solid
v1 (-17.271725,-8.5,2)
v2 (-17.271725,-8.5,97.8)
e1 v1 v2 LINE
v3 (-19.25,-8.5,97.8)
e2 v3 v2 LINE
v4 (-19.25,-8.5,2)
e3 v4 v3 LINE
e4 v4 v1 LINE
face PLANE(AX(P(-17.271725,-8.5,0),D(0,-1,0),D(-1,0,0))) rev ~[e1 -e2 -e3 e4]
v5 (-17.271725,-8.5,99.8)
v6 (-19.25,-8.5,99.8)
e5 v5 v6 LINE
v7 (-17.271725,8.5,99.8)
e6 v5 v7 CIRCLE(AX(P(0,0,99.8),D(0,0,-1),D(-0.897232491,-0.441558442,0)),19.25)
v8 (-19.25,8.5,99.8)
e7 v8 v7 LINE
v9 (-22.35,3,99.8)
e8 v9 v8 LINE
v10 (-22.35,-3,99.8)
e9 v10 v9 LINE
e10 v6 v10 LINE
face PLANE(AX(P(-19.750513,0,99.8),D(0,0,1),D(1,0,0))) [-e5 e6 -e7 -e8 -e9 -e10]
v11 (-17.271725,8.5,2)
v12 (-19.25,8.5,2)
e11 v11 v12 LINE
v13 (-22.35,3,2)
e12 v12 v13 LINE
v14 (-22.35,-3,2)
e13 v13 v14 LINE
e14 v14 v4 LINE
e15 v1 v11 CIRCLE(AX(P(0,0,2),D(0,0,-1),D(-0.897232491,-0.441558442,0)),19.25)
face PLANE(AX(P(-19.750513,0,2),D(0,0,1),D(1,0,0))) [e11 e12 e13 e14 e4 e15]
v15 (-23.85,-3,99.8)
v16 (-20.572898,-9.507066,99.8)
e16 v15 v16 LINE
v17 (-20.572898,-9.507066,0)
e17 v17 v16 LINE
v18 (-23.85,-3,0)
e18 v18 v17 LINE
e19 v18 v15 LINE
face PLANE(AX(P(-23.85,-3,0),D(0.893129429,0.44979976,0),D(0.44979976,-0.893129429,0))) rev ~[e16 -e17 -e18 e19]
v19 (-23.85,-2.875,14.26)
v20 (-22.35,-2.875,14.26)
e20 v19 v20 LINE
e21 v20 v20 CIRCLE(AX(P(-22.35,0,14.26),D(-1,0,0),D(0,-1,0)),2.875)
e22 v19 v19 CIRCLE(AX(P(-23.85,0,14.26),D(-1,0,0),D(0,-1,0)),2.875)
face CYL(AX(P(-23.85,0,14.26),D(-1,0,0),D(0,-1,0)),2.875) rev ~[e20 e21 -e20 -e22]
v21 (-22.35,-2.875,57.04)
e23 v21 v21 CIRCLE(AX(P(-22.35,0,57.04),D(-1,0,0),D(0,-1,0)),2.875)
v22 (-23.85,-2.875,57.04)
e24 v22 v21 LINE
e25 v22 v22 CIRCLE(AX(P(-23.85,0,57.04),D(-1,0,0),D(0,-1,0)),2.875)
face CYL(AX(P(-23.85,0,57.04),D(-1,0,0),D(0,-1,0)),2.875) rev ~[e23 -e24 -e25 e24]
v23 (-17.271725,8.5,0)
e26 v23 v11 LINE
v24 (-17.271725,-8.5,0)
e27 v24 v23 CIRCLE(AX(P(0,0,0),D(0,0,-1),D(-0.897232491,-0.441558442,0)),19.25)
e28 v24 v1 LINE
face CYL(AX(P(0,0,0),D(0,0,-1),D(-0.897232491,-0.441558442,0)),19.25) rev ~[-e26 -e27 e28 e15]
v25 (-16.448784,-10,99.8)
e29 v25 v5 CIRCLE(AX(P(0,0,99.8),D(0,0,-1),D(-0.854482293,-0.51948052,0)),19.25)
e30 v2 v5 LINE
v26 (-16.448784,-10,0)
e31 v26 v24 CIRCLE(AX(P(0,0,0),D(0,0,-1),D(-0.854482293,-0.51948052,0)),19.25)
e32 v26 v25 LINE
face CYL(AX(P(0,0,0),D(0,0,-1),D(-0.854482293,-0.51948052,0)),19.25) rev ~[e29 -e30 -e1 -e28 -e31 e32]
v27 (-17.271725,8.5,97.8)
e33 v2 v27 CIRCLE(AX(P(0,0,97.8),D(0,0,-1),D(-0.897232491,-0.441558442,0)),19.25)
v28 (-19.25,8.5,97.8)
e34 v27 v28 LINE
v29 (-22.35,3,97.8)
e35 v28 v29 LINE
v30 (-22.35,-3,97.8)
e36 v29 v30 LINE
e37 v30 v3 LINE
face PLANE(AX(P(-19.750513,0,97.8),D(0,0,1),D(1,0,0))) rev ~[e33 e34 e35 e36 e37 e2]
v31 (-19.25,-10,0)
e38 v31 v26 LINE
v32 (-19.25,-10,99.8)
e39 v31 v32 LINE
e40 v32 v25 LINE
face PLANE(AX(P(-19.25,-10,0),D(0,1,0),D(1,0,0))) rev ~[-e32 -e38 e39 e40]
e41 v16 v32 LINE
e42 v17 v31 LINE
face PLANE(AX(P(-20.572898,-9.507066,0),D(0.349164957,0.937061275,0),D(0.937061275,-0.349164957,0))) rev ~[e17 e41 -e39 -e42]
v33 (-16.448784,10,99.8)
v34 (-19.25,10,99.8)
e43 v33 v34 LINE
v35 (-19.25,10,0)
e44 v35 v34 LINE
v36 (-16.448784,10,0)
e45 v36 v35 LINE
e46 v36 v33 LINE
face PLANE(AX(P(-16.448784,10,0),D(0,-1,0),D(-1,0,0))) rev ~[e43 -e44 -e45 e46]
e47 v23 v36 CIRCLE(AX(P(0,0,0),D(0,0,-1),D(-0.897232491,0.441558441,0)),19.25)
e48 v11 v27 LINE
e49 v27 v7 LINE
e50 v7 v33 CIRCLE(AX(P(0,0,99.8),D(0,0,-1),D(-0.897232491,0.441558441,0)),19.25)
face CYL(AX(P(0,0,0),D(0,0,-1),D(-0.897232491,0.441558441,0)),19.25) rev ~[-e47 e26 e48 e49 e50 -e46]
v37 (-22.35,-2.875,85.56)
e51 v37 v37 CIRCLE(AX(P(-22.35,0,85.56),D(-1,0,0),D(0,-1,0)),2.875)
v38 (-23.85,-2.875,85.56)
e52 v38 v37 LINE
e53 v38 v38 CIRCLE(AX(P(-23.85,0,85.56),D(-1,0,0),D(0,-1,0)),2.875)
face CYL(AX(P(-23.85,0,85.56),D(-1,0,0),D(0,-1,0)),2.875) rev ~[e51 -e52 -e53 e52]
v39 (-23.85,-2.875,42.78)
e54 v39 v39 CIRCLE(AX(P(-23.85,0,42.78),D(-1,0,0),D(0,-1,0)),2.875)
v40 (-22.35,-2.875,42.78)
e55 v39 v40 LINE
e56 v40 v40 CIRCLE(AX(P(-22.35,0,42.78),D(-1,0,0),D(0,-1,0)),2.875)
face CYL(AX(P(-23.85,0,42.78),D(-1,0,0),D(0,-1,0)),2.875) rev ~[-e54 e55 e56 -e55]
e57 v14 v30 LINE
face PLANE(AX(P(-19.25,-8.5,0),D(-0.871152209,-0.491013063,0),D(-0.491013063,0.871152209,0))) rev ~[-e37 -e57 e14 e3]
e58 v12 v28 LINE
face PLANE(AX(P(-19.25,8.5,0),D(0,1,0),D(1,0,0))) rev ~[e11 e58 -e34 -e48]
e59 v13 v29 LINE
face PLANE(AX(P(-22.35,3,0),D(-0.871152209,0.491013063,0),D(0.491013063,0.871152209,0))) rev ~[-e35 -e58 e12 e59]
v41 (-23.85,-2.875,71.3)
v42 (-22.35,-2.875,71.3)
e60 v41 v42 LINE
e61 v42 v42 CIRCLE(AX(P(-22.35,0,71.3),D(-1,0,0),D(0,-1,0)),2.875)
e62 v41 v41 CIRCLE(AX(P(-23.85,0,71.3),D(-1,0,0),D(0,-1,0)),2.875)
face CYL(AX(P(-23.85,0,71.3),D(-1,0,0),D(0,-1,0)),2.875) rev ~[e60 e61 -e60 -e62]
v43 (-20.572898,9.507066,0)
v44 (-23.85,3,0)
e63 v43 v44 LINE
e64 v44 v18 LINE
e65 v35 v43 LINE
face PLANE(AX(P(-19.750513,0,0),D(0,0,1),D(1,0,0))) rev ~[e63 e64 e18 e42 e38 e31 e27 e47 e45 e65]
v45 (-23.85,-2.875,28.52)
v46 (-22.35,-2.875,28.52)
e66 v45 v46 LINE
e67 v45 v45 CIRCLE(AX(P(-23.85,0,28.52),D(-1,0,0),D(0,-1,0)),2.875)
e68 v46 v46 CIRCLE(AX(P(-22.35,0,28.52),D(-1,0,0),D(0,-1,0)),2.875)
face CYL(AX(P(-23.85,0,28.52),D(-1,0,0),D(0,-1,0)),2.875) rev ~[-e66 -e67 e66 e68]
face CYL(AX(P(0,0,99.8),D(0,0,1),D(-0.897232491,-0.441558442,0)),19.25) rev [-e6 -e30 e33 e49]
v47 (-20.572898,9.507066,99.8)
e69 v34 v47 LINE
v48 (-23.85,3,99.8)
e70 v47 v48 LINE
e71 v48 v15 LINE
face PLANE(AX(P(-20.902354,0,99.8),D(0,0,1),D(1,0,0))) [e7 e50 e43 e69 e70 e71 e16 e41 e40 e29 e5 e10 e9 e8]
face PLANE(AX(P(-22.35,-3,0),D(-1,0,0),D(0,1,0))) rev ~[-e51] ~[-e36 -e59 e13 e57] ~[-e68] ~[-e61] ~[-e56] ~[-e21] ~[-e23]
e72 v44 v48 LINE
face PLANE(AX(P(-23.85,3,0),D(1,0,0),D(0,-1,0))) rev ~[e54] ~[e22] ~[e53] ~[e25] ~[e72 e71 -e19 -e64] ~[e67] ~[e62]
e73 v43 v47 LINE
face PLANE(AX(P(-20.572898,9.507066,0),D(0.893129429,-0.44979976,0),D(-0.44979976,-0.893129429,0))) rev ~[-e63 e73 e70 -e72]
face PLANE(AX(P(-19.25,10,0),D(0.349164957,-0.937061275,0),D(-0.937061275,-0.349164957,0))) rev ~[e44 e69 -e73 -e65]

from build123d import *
from build123d import SkipClean  # not in build123d's __all__

# Parameters (mm, degrees)
F1_DEPTH = 99.8
F2_R     = 2.875
F3_DEPTH = 4
F4_DEPTH = 2
F6_DEPTH = 2


with BuildPart() as f1:
    # F0 (on Top) → F1 (new body)
    with BuildSketch(Plane.XY):
        with BuildLine():
            ThreePointArc((-17.2717254494, 8.5), (-16.8769277982, 9.2591472661), (-16.4487841496, 10))
            Line((-16.4487841496, 10), (-19.25, 10))
            Line((-19.25, 10), (-20.572897503, 9.5070659068))
            Line((-20.572897503, 9.5070659068), (-23.85, 3))
            Line((-23.85, 3), (-23.85, -3))
            Line((-23.85, -3), (-20.572897503, -9.5070659068))
            Line((-20.572897503, -9.5070659068), (-19.25, -10))
            Line((-19.25, -10), (-16.4487841496, -10))
            ThreePointArc((-16.4487841496, -10), (-16.8769277982, -9.2591472661), (-17.2717254494, -8.5))
            Line((-17.2717254494, -8.5), (-19.25, -8.5))
            Line((-19.25, -8.5), (-22.35, -3))
            Line((-22.35, -3), (-22.35, 0))
            Line((-22.35, 0), (-22.35, 3))
            Line((-22.35, 3), (-19.25, 8.5))
            Line((-19.25, 8.5), (-17.2717254494, 8.5))
        make_face()
    extrude(amount=F1_DEPTH)

    # F2 (on face) → F3 (cut)
    with BuildSketch(Plane(origin=(-23.85, 0, 0), x_dir=(0, -1, 0), z_dir=(-1, 0, 0))):
        with Locations((0, 14.26)):
            Circle(F2_R)
        with Locations((0, 28.52)):
            Circle(F2_R)
        with Locations((0, 42.78)):
            Circle(F2_R)
        with Locations((0, 57.04)):
            Circle(F2_R)
        with Locations((0, 71.3)):
            Circle(F2_R)
        with Locations((0, 85.56)):
            Circle(F2_R)
    extrude(amount=-F3_DEPTH, mode=Mode.SUBTRACT)

    # F0 (on Top) → F4 (join)
    with BuildSketch(Plane.XY):
        with BuildLine():
            ThreePointArc((-17.2717254494, -8.5), (-19.25, 0), (-17.2717254494, 8.5))
            Line((-17.2717254494, 8.5), (-19.25, 8.5))
            Line((-19.25, 8.5), (-22.35, 3))
            Line((-22.35, 3), (-22.35, 0))
            Line((-22.35, 0), (-22.35, -3))
            Line((-22.35, -3), (-19.25, -8.5))
            Line((-19.25, -8.5), (-17.2717254494, -8.5))
        make_face()
    extrude(amount=F4_DEPTH)

    # F5 (on face) → F6 (join)
    with BuildSketch(Plane.XY.offset(99.8)):
        with BuildLine():
            ThreePointArc((-17.2717254494, -8.5), (-19.25, 0), (-17.2717254494, 8.5))
            Line((-17.2717254494, 8.5), (-19.25, 8.5))
            Line((-19.25, 8.5), (-22.35, 3))
            Line((-22.35, 3), (-22.35, -3))
            Line((-22.35, -3), (-19.25, -8.5))
            Line((-19.25, -8.5), (-17.2717254494, -8.5))
        make_face()
    with SkipClean():  # cleaning this boolean's faces spoils the solid; the shape is the same uncleaned
        extrude(amount=-F6_DEPTH)


solid = f1.part
